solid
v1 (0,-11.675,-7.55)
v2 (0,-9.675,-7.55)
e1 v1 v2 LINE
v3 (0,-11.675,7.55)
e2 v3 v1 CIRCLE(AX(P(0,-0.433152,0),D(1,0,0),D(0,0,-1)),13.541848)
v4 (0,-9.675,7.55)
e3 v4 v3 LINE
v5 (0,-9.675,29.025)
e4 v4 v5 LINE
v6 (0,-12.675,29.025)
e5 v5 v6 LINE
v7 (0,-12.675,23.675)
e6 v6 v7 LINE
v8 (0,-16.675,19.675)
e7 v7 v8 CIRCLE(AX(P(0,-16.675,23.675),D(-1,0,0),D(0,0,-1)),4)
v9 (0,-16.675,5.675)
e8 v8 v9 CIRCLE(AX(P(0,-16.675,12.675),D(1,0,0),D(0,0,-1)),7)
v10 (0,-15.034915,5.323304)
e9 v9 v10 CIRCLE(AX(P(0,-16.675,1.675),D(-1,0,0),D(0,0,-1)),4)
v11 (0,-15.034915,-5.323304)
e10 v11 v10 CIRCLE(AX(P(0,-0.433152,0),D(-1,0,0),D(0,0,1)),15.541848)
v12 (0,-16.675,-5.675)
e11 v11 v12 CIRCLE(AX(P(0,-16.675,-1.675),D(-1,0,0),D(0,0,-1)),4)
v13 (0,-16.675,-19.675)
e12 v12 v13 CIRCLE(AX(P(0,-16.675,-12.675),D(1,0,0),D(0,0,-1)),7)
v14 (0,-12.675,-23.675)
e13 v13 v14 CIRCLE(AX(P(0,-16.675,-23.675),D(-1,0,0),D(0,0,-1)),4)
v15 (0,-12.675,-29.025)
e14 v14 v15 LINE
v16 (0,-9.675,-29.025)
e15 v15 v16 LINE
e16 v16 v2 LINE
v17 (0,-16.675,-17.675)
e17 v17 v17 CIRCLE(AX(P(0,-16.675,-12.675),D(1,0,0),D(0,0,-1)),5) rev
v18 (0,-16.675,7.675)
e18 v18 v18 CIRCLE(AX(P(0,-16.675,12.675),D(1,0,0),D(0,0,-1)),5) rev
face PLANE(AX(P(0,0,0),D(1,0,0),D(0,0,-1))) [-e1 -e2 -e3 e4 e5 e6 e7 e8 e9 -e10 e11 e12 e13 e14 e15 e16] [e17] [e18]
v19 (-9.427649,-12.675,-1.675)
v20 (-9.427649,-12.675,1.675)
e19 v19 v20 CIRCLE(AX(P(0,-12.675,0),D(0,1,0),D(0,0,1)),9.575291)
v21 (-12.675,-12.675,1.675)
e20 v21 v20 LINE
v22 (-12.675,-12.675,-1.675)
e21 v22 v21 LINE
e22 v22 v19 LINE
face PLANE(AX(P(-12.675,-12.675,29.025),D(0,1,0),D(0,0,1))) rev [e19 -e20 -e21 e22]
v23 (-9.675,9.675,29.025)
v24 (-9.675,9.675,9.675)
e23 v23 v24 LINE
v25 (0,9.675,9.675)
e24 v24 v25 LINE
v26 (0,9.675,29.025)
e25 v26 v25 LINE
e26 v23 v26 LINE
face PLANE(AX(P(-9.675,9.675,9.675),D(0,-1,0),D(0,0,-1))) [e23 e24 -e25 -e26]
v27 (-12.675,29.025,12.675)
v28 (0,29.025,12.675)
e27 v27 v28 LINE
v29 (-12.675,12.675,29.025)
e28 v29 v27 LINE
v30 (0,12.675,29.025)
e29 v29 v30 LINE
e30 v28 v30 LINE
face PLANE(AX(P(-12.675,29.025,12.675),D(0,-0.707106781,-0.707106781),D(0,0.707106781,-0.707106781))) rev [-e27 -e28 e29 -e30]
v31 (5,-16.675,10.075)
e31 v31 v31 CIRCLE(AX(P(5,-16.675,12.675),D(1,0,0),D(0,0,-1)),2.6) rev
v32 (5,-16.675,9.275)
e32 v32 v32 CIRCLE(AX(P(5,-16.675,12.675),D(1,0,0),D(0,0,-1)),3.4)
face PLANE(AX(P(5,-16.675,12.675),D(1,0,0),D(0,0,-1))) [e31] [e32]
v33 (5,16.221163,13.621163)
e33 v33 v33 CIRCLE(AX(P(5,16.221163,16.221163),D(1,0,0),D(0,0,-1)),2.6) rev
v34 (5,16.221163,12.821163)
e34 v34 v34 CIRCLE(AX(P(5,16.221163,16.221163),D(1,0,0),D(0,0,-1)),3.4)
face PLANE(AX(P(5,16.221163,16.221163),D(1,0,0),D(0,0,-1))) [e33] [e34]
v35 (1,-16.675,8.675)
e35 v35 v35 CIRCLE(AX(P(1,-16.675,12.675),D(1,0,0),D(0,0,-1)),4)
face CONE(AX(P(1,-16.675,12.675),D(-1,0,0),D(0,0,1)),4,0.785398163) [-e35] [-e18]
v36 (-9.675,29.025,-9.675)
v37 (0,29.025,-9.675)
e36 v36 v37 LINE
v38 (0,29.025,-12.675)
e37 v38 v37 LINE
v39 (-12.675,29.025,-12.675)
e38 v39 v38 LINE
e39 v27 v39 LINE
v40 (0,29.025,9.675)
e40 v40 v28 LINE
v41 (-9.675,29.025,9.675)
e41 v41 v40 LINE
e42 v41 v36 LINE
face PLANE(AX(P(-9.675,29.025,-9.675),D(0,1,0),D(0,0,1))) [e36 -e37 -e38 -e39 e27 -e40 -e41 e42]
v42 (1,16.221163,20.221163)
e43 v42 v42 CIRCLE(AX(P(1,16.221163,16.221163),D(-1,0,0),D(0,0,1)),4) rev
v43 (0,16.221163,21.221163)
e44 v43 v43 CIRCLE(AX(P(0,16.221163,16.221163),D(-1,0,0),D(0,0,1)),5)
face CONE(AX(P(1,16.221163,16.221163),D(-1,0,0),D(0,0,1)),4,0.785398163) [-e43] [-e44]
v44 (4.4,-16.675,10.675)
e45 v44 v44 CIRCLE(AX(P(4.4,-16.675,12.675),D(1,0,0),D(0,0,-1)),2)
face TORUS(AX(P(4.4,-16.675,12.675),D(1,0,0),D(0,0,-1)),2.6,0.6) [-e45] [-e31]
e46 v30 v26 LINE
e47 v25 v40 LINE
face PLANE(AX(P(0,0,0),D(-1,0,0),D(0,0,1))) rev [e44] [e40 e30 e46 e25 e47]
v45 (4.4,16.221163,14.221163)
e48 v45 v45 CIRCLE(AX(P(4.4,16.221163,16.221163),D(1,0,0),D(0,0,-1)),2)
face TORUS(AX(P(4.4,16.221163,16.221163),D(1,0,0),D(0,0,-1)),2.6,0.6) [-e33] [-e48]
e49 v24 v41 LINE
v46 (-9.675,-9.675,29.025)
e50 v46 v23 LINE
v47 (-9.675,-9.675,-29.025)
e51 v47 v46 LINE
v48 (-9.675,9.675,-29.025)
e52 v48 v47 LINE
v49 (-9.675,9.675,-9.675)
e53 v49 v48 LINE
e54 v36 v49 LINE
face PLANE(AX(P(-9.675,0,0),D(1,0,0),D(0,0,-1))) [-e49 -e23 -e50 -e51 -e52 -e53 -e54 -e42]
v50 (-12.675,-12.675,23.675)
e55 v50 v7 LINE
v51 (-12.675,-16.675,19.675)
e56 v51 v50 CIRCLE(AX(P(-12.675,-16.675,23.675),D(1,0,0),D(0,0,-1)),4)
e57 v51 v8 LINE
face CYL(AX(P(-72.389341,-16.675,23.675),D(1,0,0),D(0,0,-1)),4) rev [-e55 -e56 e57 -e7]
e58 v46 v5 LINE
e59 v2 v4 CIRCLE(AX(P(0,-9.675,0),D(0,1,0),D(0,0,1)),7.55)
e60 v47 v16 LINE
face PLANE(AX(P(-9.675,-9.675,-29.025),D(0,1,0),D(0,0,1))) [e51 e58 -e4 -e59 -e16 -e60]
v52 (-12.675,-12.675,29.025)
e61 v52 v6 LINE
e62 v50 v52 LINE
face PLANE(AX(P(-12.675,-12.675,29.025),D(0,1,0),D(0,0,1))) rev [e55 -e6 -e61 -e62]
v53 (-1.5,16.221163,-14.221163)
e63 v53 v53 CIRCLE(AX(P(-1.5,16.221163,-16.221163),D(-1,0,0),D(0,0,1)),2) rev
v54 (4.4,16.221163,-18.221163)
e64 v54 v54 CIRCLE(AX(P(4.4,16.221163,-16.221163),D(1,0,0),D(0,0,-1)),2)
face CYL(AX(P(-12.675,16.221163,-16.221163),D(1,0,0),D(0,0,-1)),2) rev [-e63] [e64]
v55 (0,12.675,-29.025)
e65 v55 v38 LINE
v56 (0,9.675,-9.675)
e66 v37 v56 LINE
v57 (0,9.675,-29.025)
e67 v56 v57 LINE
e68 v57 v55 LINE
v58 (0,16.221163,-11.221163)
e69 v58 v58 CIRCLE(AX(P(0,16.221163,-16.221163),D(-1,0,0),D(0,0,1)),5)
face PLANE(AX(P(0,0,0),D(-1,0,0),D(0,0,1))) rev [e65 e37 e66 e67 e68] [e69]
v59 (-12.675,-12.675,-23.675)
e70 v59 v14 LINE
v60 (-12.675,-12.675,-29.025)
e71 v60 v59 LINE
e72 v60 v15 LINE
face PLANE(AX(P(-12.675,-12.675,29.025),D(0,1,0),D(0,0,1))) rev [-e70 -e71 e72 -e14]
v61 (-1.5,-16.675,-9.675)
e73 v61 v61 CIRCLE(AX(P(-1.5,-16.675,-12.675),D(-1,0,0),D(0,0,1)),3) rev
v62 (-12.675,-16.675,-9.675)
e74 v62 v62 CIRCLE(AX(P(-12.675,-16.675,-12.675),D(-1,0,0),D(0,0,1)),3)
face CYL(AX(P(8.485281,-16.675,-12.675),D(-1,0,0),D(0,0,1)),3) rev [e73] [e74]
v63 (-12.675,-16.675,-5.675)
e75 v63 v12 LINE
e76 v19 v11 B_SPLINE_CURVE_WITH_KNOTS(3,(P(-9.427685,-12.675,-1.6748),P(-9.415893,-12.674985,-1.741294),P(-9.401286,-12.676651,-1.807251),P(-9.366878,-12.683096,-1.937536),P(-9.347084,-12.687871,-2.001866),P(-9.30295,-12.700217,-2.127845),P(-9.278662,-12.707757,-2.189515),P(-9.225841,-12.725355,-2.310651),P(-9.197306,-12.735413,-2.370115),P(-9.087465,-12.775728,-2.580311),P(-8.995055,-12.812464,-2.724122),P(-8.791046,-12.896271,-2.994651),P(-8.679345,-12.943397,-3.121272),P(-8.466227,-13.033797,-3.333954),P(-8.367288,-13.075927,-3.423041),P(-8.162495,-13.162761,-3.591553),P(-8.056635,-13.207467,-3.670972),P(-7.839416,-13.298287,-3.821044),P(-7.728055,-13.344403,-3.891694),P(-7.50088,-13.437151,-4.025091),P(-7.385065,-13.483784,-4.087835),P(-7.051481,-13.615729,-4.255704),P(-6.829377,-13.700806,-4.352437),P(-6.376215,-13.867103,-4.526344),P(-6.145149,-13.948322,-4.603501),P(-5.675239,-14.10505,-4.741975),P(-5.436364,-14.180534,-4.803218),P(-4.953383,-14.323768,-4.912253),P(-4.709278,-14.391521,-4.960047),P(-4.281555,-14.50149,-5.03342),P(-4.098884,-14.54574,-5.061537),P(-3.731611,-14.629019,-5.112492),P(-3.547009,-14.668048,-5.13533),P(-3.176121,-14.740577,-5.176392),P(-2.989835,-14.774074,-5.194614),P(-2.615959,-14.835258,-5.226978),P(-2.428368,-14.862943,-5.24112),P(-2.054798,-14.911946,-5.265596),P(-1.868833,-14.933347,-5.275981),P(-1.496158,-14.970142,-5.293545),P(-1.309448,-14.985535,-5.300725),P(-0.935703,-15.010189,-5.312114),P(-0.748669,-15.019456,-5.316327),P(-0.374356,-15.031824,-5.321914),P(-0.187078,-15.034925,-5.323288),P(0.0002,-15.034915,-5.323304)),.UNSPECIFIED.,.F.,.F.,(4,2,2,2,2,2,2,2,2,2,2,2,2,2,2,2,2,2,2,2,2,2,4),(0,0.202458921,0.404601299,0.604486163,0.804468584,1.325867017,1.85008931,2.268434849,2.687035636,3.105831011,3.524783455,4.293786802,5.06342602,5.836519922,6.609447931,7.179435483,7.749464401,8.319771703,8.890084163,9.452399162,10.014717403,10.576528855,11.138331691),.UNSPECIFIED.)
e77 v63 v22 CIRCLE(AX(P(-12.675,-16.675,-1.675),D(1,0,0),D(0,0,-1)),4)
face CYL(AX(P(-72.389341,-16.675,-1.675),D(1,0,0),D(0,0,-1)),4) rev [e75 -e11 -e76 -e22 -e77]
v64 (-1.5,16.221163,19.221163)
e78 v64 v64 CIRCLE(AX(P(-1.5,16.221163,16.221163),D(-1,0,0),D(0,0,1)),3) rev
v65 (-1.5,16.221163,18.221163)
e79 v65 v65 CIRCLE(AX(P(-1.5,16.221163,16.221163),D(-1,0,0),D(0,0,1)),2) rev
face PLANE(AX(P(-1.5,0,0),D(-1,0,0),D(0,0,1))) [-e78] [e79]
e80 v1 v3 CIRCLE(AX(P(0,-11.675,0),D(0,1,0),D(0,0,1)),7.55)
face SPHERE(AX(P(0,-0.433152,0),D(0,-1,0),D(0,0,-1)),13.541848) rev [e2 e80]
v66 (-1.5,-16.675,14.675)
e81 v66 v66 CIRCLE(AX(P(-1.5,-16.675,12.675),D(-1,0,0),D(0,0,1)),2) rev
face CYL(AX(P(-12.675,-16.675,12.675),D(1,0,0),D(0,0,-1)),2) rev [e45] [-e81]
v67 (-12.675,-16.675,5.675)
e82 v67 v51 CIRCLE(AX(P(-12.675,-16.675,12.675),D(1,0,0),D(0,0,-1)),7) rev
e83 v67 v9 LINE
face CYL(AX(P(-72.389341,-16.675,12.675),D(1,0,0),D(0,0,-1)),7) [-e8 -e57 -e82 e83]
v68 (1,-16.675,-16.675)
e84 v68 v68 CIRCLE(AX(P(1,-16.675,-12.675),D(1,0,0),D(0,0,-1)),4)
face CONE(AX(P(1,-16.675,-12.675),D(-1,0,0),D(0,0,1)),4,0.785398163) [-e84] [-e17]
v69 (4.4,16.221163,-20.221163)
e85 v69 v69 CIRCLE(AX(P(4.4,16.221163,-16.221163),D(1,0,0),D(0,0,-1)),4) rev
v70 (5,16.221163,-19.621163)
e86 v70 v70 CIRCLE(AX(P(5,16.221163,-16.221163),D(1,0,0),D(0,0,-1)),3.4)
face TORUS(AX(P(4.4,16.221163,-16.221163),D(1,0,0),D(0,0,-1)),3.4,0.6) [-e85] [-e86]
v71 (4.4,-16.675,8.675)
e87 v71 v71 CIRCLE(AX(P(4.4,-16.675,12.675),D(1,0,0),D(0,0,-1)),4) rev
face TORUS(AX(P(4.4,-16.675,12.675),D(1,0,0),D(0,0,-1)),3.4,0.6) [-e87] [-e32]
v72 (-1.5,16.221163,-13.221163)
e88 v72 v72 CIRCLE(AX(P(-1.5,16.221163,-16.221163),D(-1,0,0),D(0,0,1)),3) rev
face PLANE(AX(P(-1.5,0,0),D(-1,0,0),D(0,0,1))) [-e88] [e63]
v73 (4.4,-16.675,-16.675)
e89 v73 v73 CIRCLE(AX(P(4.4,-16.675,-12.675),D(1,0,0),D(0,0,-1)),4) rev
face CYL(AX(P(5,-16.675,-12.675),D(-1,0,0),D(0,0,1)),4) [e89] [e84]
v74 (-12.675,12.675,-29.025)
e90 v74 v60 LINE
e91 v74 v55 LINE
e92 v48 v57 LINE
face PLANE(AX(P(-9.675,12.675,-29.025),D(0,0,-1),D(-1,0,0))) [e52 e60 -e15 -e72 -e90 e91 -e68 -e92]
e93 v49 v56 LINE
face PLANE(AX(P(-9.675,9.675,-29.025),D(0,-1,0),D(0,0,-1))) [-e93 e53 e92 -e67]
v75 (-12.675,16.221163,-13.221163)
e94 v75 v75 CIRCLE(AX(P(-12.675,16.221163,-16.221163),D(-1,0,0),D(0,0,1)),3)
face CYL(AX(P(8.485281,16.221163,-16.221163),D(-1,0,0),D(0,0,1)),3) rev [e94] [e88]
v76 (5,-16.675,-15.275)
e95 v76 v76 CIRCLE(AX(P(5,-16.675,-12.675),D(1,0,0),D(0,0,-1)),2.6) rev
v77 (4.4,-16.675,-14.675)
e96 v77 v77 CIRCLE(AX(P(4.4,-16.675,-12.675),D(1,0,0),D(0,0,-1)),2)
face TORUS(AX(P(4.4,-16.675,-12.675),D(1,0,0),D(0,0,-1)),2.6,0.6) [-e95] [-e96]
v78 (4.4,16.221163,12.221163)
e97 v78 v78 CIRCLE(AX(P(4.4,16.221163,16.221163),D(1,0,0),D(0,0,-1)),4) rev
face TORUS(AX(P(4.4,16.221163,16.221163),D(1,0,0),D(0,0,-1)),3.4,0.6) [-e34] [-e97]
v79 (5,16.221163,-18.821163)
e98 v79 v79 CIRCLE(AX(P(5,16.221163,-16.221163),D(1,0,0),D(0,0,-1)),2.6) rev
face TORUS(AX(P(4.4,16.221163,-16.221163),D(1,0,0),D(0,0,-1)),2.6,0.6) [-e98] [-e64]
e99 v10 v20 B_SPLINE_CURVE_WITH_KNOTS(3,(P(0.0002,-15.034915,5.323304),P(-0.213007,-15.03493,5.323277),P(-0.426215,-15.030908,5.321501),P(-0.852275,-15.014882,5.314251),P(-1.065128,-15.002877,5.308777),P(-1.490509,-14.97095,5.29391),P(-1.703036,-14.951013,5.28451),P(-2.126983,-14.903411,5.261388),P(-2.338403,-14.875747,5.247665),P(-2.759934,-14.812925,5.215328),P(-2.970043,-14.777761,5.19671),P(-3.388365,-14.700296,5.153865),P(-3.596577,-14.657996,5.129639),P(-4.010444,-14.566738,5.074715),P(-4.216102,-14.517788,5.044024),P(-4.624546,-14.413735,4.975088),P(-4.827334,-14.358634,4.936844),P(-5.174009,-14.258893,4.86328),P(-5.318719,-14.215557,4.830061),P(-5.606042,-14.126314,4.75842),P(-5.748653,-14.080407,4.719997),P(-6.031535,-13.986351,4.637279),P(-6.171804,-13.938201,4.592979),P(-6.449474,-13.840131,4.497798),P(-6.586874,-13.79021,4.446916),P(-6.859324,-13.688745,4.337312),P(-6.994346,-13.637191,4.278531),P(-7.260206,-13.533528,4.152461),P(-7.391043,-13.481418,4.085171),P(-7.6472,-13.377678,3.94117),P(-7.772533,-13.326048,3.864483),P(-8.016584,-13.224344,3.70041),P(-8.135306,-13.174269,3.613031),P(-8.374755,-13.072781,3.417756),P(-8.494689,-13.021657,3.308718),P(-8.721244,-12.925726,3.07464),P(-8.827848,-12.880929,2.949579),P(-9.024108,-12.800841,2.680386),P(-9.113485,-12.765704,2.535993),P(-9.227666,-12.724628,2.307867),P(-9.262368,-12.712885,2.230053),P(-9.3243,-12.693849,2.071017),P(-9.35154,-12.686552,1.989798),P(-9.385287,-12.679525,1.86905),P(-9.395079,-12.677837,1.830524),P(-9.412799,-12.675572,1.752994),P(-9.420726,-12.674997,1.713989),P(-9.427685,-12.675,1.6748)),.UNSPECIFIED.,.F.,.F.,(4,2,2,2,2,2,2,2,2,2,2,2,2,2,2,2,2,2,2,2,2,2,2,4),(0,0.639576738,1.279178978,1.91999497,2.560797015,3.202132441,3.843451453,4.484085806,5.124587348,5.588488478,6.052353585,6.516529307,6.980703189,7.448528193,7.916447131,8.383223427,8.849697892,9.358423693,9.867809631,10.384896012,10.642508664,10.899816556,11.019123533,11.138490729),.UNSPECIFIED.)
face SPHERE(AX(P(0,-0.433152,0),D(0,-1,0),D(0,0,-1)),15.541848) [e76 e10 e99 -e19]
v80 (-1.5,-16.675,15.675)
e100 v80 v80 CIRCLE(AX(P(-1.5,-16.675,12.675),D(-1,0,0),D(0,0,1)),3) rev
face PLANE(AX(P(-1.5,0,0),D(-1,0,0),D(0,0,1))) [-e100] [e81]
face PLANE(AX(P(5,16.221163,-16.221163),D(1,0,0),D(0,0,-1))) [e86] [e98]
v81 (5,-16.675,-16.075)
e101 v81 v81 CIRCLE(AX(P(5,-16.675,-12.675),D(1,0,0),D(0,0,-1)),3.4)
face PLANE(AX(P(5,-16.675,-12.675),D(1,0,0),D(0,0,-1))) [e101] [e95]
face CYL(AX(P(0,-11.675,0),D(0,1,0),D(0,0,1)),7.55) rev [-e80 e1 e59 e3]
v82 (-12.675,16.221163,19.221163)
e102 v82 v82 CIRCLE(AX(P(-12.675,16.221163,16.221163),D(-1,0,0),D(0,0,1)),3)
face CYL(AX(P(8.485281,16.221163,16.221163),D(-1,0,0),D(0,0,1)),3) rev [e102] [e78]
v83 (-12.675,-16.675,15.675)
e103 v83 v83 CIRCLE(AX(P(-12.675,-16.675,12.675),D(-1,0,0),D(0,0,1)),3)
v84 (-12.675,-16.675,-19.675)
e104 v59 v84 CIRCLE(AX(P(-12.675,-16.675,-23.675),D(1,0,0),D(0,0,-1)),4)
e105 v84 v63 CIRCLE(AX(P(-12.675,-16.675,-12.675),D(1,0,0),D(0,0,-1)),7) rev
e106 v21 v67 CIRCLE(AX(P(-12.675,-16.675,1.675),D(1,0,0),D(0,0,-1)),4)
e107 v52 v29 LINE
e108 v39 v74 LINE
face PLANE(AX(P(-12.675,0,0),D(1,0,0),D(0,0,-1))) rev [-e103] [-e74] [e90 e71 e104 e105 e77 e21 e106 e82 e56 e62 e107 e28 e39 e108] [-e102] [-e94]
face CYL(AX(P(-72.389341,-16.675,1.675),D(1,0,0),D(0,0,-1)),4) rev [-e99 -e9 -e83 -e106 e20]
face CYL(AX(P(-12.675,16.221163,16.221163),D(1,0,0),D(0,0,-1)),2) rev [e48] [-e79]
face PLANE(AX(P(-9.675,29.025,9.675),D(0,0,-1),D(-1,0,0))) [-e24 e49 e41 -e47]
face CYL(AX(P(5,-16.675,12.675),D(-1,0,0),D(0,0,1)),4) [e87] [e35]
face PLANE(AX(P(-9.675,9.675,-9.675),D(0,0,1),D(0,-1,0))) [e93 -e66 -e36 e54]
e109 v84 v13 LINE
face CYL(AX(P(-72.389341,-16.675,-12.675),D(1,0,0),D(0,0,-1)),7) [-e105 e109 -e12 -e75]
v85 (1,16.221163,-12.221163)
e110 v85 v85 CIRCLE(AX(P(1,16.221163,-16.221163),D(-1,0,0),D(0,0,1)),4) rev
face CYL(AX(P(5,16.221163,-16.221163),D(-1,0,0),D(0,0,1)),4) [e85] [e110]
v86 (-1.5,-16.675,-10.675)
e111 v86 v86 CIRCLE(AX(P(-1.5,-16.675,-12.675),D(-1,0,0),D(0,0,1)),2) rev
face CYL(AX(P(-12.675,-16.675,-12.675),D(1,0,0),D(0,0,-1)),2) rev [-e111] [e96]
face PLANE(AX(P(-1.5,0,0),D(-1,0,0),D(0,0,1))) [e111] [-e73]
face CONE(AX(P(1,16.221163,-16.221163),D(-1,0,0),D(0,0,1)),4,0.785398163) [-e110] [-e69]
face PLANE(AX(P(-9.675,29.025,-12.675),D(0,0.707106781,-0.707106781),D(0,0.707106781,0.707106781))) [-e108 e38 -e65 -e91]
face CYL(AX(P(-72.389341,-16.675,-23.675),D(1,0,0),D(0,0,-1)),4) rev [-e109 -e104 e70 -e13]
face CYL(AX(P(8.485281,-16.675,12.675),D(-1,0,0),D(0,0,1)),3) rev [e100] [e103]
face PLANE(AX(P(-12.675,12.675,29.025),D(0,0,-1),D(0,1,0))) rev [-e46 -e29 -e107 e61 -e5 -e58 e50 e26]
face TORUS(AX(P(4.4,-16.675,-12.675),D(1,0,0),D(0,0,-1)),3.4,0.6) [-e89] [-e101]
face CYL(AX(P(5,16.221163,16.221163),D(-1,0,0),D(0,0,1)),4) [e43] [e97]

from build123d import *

# Parameters (mm, degrees)
BOSS_EXTRUDE1_DEPTH   = 9.675
SKETCH2_W             = 58.05
SKETCH2_H             = 3
BOSS_EXTRUDE1_2_DEPTH = 9.675
BOSS_EXTRUDE1_3_DEPTH = 9.675
BOSS_EXTRUDE2_DEPTH   = 3
BOSS_EXTRUDE3_DEPTH   = 12.675
SKETCH6_R             = 2
CUT_EXTRUDE1_DEPTH    = 43.959945007
SKETCH7_R             = 3
CUT_EXTRUDE3_DEPTH    = 11.175
BOSS_EXTRUDE4_START   = 5
SKETCH8_R             = 4
SKETCH8_R_2           = 2
BOSS_EXTRUDE4_DEPTH   = 5
CHAMFER1_SIZE         = 1
FILLET1_R             = 0.6
SKETCH10_R            = 7.55
CUT_EXTRUDE4_DEPTH    = 2
REVOLVE1_ANGLE        = 180


with BuildPart() as part:
    # Sketch2 → Boss-Extrude1 (new body)
    with BuildSketch(Plane(origin=(0, 0, 0), x_dir=(0, 0, -1), z_dir=(1, 0, 0))):
        Polygon((-29.025, 9.675), (-29.025, 12.675), (-12.675, 29.025), (-9.675, 29.025), (-9.675, 9.675), align=None)
    extrude(amount=-BOSS_EXTRUDE1_DEPTH)



with BuildPart() as body_2:
    # Sketch2 → Boss-Extrude1 2 (new body)
    with BuildSketch(Plane(origin=(0, 0, 0), x_dir=(0, 0, -1), z_dir=(1, 0, 0))):
        with Locations((0, -11.175)):
            Rectangle(SKETCH2_W, SKETCH2_H)
    extrude(amount=-BOSS_EXTRUDE1_2_DEPTH)


with BuildPart() as body_3:
    # Sketch2 → Boss-Extrude1 3 (new body)
    with BuildSketch(Plane(origin=(0, 0, 0), x_dir=(0, 0, -1), z_dir=(1, 0, 0))):
        Polygon((9.675, 29.025), (12.675, 29.025), (29.025, 12.675), (29.025, 9.675), (9.675, 9.675), align=None)
    extrude(amount=-BOSS_EXTRUDE1_3_DEPTH)


with BuildPart() as part_1:
    add(part.part)

    add(body_2.part)  # Boss-Extrude2 merges body 2

    add(body_3.part)  # Boss-Extrude2 merges body 3
    # Sketch3 → Boss-Extrude2 (add)
    with BuildSketch(Plane.ZY.offset(9.675)):
        Polygon((-29.025, 12.675), (-12.675, 29.025), (12.675, 29.025), (29.025, 12.675), (29.025, -12.675), (-29.025, -12.675), align=None)
    extrude(amount=BOSS_EXTRUDE2_DEPTH)

    # Sketch5 → Boss-Extrude3 (add)
    with BuildSketch(Plane(origin=(0, 0, 0), x_dir=(0, 0, -1), z_dir=(1, 0, 0))):
        with BuildLine():
            Line((-29.025, -12.675), (-23.675, -12.675))
            ThreePointArc((-23.675, -12.675), (-20.846572875, -13.846572875), (-19.675, -16.675))
            ThreePointArc((-19.675, -16.675), (-12.675, -23.675), (-5.675, -16.675))
            ThreePointArc((-5.675, -16.675), (-4.503427125, -13.846572875), (-1.675, -12.675))
            Line((-1.675, -12.675), (1.675, -12.675))
            ThreePointArc((1.675, -12.675), (4.503427125, -13.846572875), (5.675, -16.675))
            ThreePointArc((5.675, -16.675), (12.675, -23.675), (19.675, -16.675))
            ThreePointArc((19.675, -16.675), (20.846572875, -13.846572875), (23.675, -12.675))
            Line((23.675, -12.675), (29.025, -12.675))
            Line((29.025, -12.675), (29.025, -9.675))
            Line((29.025, -9.675), (-29.025, -9.675))
            Line((-29.025, -9.675), (-29.025, -12.675))
        make_face()
    extrude(amount=-BOSS_EXTRUDE3_DEPTH)

    # Sketch6 → Cut-Extrude1 (cut, through all)
    with BuildSketch(Plane(origin=(0, 0, 0), x_dir=(0, 0, -1), z_dir=(1, 0, 0))):
        with Locations((-12.675, -16.675)):
            Circle(SKETCH6_R)
        with Locations((12.675, -16.675)):
            Circle(SKETCH6_R)
        with Locations((-16.22116344, 16.22116344)):
            Circle(SKETCH6_R)
        with Locations(Location((16.22116344, 16.22116344, 0), (0, 0, 180))):
            Circle(SKETCH6_R)
    extrude(amount=-CUT_EXTRUDE1_DEPTH, mode=Mode.SUBTRACT)

    # Sketch7 → Cut-Extrude3 (cut)
    with BuildSketch(Plane.ZY.offset(12.675)):
        with Locations((-16.22116344, 16.22116344)):
            Circle(SKETCH7_R)
        with Locations((16.22116344, 16.22116344)):
            Circle(SKETCH7_R)
        with Locations((-12.675, -16.675)):
            Circle(SKETCH7_R)
        with Locations((12.675, -16.675)):
            Circle(SKETCH7_R)
    extrude(amount=-CUT_EXTRUDE3_DEPTH, mode=Mode.SUBTRACT)

    # Sketch8 → Boss-Extrude4 (add)
    # profile 1 of 4: a face of its own
    with BuildSketch(Plane(origin=(0, 0, 0), x_dir=(0, 0, -1), z_dir=(1, 0, 0)).offset(BOSS_EXTRUDE4_START)):
        with Locations(Location((-16.22116344, 16.22116344, 0), (0, 0, 180))):
            Circle(SKETCH8_R)
        with Locations((-16.22116344, 16.22116344)):
            Circle(SKETCH8_R_2, mode=Mode.SUBTRACT)
    # profile 2 of 4: a face of its own
    with BuildSketch(Plane(origin=(0, 0, 0), x_dir=(0, 0, -1), z_dir=(1, 0, 0)).offset(BOSS_EXTRUDE4_START)):
        with Locations(Location((16.22116344, 16.22116344, 0), (0, 0, 180))):
            Circle(SKETCH8_R)
        with Locations((16.22116344, 16.22116344)):
            Circle(SKETCH8_R_2, mode=Mode.SUBTRACT)
    # profile 3 of 4: a face of its own
    with BuildSketch(Plane(origin=(0, 0, 0), x_dir=(0, 0, -1), z_dir=(1, 0, 0)).offset(BOSS_EXTRUDE4_START)):
        with Locations((12.675, -16.675)):
            Circle(SKETCH8_R)
        with Locations((12.675, -16.675)):
            Circle(SKETCH8_R_2, mode=Mode.SUBTRACT)
    # profile 4 of 4: a face of its own
    with BuildSketch(Plane(origin=(0, 0, 0), x_dir=(0, 0, -1), z_dir=(1, 0, 0)).offset(BOSS_EXTRUDE4_START)):
        with Locations((-12.675, -16.675)):
            Circle(SKETCH8_R)
        with Locations((-12.675, -16.675)):
            Circle(SKETCH8_R_2, mode=Mode.SUBTRACT)
    extrude(amount=-BOSS_EXTRUDE4_DEPTH)

    # Chamfer1
    chamfer1_edges = [part_1.edges().sort_by_distance(p)[0] for p in [
        (0, 16.22116344, 12.22116344),
        (0, 16.22116344, -20.22116344),
        (0, -16.675, -8.675),
        (0, -16.675, 16.675),
    ]]
    chamfer(chamfer1_edges, length=CHAMFER1_SIZE)

    # Fillet1
    # the kernel refuses this fillet: 0.6 mm, written as the material it takes off along each edge
    with BuildSketch(Plane(origin=(5, 16.22116344, 16.22116344), x_dir=(0, 0, 1), z_dir=(0, 1, 0))) as fillet1_piece_1:
        with BuildLine():
            CenterArc((4 - FILLET1_R, -FILLET1_R), FILLET1_R, 0, 90)
            Line((4 - FILLET1_R, 0), (4, 0))
            Line((4, 0), (4, -FILLET1_R))
        make_face()
    revolve(axis=Axis((5, 16.22116344, 16.22116344), (1, 0, 0)), mode=Mode.SUBTRACT)
    with BuildSketch(Plane(origin=(5, 16.22116344, 16.22116344), x_dir=(0, 0, -1), z_dir=(0, -1, 0))) as fillet1_piece_2:
        with BuildLine():
            CenterArc((2 + FILLET1_R, -FILLET1_R), FILLET1_R, 90, 90)
            Line((2 + FILLET1_R, 0), (2, 0))
            Line((2, 0), (2, -FILLET1_R))
        make_face()
    revolve(axis=Axis((5, 16.22116344, 16.22116344), (1, 0, 0)), mode=Mode.SUBTRACT)
    with BuildSketch(Plane(origin=(5, 16.22116344, -16.22116344), x_dir=(0, 0, 1), z_dir=(0, 1, 0))) as fillet1_piece_3:
        with BuildLine():
            CenterArc((4 - FILLET1_R, -FILLET1_R), FILLET1_R, 0, 90)
            Line((4 - FILLET1_R, 0), (4, 0))
            Line((4, 0), (4, -FILLET1_R))
        make_face()
    revolve(axis=Axis((5, 16.22116344, -16.22116344), (1, 0, 0)), mode=Mode.SUBTRACT)
    with BuildSketch(Plane(origin=(5, 16.22116344, -16.22116344), x_dir=(0, 0, -1), z_dir=(0, -1, 0))) as fillet1_piece_4:
        with BuildLine():
            CenterArc((2 + FILLET1_R, -FILLET1_R), FILLET1_R, 90, 90)
            Line((2, -FILLET1_R), (2, 0))
            Line((2, 0), (2 + FILLET1_R, 0))
        make_face()
    revolve(axis=Axis((5, 16.22116344, -16.22116344), (1, 0, 0)), mode=Mode.SUBTRACT)
    with BuildSketch(Plane(origin=(5, -16.675, -12.675), x_dir=(0, 0, -1), z_dir=(0, -1, 0))) as fillet1_piece_5:
        with BuildLine():
            CenterArc((4 - FILLET1_R, -FILLET1_R), FILLET1_R, 0, 90)
            Line((4 - FILLET1_R, 0), (4, 0))
            Line((4, 0), (4, -FILLET1_R))
        make_face()
    revolve(axis=Axis((5, -16.675, -12.675), (1, 0, 0)), mode=Mode.SUBTRACT)
    with BuildSketch(Plane(origin=(5, -16.675, -12.675), x_dir=(0, 0, -1), z_dir=(0, -1, 0))) as fillet1_piece_6:
        with BuildLine():
            CenterArc((2 + FILLET1_R, -FILLET1_R), FILLET1_R, 90, 90)
            Line((2 + FILLET1_R, 0), (2, 0))
            Line((2, 0), (2, -FILLET1_R))
        make_face()
    revolve(axis=Axis((5, -16.675, -12.675), (1, 0, 0)), mode=Mode.SUBTRACT)
    with BuildSketch(Plane(origin=(5, -16.675, 12.675), x_dir=(0, 0, -1), z_dir=(0, -1, 0))) as fillet1_piece_7:
        with BuildLine():
            CenterArc((4 - FILLET1_R, -FILLET1_R), FILLET1_R, 0, 90)
            Line((4 - FILLET1_R, 0), (4, 0))
            Line((4, 0), (4, -FILLET1_R))
        make_face()
    revolve(axis=Axis((5, -16.675, 12.675), (1, 0, 0)), mode=Mode.SUBTRACT)
    with BuildSketch(Plane(origin=(5, -16.675, 12.675), x_dir=(0, 0, -1), z_dir=(0, -1, 0))) as fillet1_piece_8:
        with BuildLine():
            CenterArc((2 + FILLET1_R, -FILLET1_R), FILLET1_R, 90, 90)
            Line((2 + FILLET1_R, 0), (2, 0))
            Line((2, 0), (2, -FILLET1_R))
        make_face()
    revolve(axis=Axis((5, -16.675, 12.675), (1, 0, 0)), mode=Mode.SUBTRACT)

    # Sketch10 → Cut-Extrude4 (cut)
    with BuildSketch(Plane(origin=(0, -9.675, 0), x_dir=(1, 0, 0), z_dir=(0, 1, 0))):
        Circle(SKETCH10_R)
    extrude(amount=-CUT_EXTRUDE4_DEPTH, mode=Mode.SUBTRACT)

    # Sketch11 → Revolve1 (revolve)
    with BuildSketch(Plane(origin=(0, 0, 0), x_dir=(0, 0, -1), z_dir=(1, 0, 0))):
        with BuildLine():
            Line((0, -11.675), (0, -15.975))
            ThreePointArc((0, -15.975), (5.780568556, -14.860004257), (10.731723594, -11.675))
            Line((10.731723594, -11.675), (0, -11.675))
        make_face()
    revolve(axis=Axis((0, -11.675, 0), (0, 1, 0)), revolution_arc=REVOLVE1_ANGLE)

    # Sketch12 → Cut-Revolve1 (revolve, cut)
    with BuildSketch(Plane(origin=(0, 0, 0), x_dir=(0, 0, -1), z_dir=(1, 0, 0))):
        with BuildLine():
            Line((0, -13.975), (0, -11.675))
            Line((0, -11.675), (7.55, -11.675))
            ThreePointArc((7.55, -11.675), (3.946279894, -13.387244869), (0, -13.975))
        make_face()
    revolve(axis=Axis((0, -13.975, 0), (0, 1, 0)), mode=Mode.SUBTRACT)


solid = part_1.part
